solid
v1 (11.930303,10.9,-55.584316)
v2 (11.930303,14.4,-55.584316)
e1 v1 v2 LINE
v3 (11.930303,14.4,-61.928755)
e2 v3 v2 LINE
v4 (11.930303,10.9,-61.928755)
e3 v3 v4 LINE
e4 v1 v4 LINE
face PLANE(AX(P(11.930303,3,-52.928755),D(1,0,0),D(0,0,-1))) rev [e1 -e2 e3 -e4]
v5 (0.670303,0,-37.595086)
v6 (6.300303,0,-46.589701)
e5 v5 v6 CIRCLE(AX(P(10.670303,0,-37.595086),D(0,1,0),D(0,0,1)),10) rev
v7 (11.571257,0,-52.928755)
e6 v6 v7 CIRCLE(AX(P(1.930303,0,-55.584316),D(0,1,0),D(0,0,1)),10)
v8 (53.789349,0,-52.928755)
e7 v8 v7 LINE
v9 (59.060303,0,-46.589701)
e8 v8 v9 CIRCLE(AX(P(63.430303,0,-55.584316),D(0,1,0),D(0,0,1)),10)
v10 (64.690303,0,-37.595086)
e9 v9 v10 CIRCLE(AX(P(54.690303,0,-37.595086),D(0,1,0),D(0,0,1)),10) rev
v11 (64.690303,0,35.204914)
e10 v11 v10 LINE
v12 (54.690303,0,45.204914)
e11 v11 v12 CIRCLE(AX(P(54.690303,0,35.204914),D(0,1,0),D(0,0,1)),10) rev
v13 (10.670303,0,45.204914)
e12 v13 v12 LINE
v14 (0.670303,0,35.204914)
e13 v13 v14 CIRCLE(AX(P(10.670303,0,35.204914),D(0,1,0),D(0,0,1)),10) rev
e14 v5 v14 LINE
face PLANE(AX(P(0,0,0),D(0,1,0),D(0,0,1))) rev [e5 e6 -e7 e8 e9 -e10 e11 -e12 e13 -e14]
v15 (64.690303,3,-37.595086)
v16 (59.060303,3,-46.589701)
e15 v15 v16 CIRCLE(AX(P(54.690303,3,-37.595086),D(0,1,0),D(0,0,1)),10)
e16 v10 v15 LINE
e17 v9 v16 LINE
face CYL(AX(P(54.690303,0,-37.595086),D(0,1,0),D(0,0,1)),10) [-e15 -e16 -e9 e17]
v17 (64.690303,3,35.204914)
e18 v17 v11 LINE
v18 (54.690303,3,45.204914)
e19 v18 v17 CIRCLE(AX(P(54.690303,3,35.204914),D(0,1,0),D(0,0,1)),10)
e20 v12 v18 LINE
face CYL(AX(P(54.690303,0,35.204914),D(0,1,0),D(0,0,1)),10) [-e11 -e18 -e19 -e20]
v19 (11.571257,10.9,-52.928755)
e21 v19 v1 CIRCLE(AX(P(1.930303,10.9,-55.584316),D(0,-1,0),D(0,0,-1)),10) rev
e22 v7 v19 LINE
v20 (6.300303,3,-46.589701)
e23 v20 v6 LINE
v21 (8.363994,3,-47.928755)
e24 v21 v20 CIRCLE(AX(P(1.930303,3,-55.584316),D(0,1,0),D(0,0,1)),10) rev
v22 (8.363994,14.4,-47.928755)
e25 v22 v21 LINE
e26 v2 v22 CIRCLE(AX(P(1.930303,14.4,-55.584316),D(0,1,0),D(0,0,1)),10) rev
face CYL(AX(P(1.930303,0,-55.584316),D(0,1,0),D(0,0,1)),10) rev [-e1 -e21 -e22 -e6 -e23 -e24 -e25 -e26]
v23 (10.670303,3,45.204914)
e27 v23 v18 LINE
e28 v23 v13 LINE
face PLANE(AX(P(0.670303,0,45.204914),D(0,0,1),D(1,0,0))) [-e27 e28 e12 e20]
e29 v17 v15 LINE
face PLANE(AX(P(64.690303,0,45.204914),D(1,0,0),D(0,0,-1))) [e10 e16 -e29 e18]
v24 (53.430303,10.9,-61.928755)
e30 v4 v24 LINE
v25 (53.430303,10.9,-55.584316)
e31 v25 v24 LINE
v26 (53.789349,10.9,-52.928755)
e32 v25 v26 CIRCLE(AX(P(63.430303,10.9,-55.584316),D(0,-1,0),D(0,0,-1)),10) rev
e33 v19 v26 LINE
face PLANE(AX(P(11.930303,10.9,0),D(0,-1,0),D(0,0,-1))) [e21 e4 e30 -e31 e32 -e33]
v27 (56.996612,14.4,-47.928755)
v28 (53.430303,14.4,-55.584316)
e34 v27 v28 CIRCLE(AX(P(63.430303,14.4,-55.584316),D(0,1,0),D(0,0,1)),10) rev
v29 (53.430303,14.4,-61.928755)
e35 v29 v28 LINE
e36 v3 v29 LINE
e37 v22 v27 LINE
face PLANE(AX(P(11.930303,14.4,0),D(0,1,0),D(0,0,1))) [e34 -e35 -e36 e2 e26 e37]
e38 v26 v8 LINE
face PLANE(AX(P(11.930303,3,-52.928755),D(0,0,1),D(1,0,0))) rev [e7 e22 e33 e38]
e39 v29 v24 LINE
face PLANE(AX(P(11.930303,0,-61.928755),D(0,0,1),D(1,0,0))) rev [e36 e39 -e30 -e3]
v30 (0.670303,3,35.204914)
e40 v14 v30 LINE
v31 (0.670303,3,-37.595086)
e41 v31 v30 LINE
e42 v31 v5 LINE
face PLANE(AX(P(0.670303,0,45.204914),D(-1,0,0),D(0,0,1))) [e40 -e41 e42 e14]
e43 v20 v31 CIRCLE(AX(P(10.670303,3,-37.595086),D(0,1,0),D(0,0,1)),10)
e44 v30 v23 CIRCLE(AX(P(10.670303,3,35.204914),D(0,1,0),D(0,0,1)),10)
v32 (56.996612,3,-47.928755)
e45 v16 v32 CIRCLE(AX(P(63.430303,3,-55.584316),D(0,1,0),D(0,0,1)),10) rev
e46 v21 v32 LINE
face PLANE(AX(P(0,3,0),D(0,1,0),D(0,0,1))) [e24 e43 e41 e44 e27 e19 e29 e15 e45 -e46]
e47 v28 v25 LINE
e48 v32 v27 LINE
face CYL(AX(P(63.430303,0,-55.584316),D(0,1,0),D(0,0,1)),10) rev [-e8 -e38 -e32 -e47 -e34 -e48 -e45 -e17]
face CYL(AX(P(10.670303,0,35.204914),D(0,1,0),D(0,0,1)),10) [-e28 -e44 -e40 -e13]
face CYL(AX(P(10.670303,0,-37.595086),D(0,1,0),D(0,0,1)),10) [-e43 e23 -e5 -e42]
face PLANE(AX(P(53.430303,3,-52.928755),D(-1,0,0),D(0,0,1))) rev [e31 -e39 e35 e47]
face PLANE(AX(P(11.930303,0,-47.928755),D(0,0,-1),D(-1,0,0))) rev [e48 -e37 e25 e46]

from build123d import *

# Parameters (mm, degrees)
SKETCH1_W           = 41.5
SKETCH1_H           = 92.8
BOSS_EXTRUDE1_DEPTH = 3
SKETCH2_W           = 5
SKETCH2_H           = 3.5
SKETCH2_H_2         = 7.9
SKETCH2_W_2         = 9
BOSS_EXTRUDE2_DEPTH = 41.5
SKETCH3_W           = 64.02
SKETCH3_H           = 92.8
BOSS_EXTRUDE3_DEPTH = 3
FILLET1_R           = 10
FILLET2_R           = 10


with BuildPart() as part:
    # Sketch1 → Boss-Extrude1 (new body)
    with BuildSketch(Plane(origin=(0, 0, 0), x_dir=(1, 0, 0), z_dir=(0, 1, 0))):
        with Locations((32.680302971, 6.528754522)):
            Rectangle(SKETCH1_W, SKETCH1_H)
    extrude(amount=BOSS_EXTRUDE1_DEPTH)

    # Sketch2 → Boss-Extrude2 (add)
    with BuildSketch(Plane(origin=(53.430302971, 0, 0), x_dir=(0, 0, -1), z_dir=(1, 0, 0))):
        with Locations((50.428754522, 12.65)):
            Rectangle(SKETCH2_W, SKETCH2_H)
        with Locations((50.428754522, 6.95)):
            Rectangle(SKETCH2_W, SKETCH2_H_2)
        with Locations((57.428754522, 12.65)):
            Rectangle(SKETCH2_W_2, SKETCH2_H)
    extrude(amount=-BOSS_EXTRUDE2_DEPTH)

    # Sketch3 → Boss-Extrude3 (add)
    with BuildSketch(Plane(origin=(0, 3, 0), x_dir=(1, 0, 0), z_dir=(0, 1, 0))):
        with Locations((32.680302971, 1.195086087)):
            Rectangle(SKETCH3_W, SKETCH3_H)
    extrude(amount=-BOSS_EXTRUDE3_DEPTH)

    # Fillet1
    fillet1_edges = [part.edges().sort_by_distance(p)[0] for p in [
        (0.670302971, 1.5, -47.595086087),
        (64.690302971, 1.5, -47.595086087),
        (64.690302971, 1.5, 45.204913913),
        (0.670302971, 1.5, 45.204913913),
    ]]
    fillet(fillet1_edges, radius=FILLET1_R)

    # Fillet2
    # the kernel refuses this fillet: 10 mm, written as the material it adds along each edge
    with BuildSketch(Plane(origin=(11.930302971, 22.973075278, -47.595086087), x_dir=(0, 0, -1), z_dir=(0, -1, 0))) as fillet2_piece_1_section:
        with BuildLine():
            CenterArc((7.989230111, -10), FILLET2_R, 90, 64.087374577)
            Line((-1.005384944, -5.63), (-1.90484645, -5.193))
            ThreePointArc((-1.90484645, -5.193), (-1, -1.26), (-1, 0))
            Line((-1, 0), (0, 1))
            Line((0, 1), (7.989230111, 1))
            Line((7.989230111, 1), (7.989230111, 0))
        make_face()
    fillet2_piece_1 = extrude(amount=22.973075278, mode=Mode.PRIVATE)
    fillet2_piece_1 = split(fillet2_piece_1, bisect_by=Plane(origin=(12.365804392, 12.65, -52.928754522), z_dir=(0, 0, -1)), keep=Keep.TOP, mode=Mode.PRIVATE)
    fillet2_piece_1 = split(fillet2_piece_1, bisect_by=Plane(origin=(12.365804392, 10.9, -54.185779558), z_dir=(0, 1, 0)), keep=Keep.TOP, mode=Mode.PRIVATE)
    fillet2_piece_1 = split(fillet2_piece_1, bisect_by=Plane(origin=(12.365804392, 14.4, -54.185779558), z_dir=(0, -1, 0)), keep=Keep.TOP, mode=Mode.PRIVATE)
    add(fillet2_piece_1)
    with BuildSketch(Plane(origin=(11.930302971, 22.973075278, -47.595086087), x_dir=(0, 0, -1), z_dir=(0, -1, 0))) as fillet2_piece_2_section:
        with BuildLine():
            CenterArc((7.989230111, -10), FILLET2_R, 90, 64.087374577)
            Line((-1.005384944, -5.63), (-1.90484645, -5.193))
            ThreePointArc((-1.90484645, -5.193), (-1, -1.26), (-1, 0))
            Line((-1, 0), (0, 1))
            Line((0, 1), (7.989230111, 1))
            Line((7.989230111, 1), (7.989230111, 0))
        make_face()
    fillet2_piece_2 = extrude(amount=22.973075278, mode=Mode.PRIVATE)
    fillet2_piece_2 = split(fillet2_piece_2, bisect_by=Plane(origin=(11.467639637, 12.65, -52.928754522), z_dir=(0, 0, 1)), keep=Keep.TOP, mode=Mode.PRIVATE)
    fillet2_piece_2 = split(fillet2_piece_2, bisect_by=Plane(origin=(11.467639637, 10.9, -49.92895082), z_dir=(0, 1, 0)), keep=Keep.TOP, mode=Mode.PRIVATE)
    fillet2_piece_2 = split(fillet2_piece_2, bisect_by=Plane(origin=(11.467639637, 14.4, -49.92895082), z_dir=(0, -1, 0)), keep=Keep.TOP, mode=Mode.PRIVATE)
    fillet2_piece_2 = split(fillet2_piece_2, bisect_by=Plane(origin=(11.467639637, 12.65, -47.928754522), z_dir=(0, 0, -1)), keep=Keep.TOP, mode=Mode.PRIVATE)
    add(fillet2_piece_2)
    with BuildSketch(Plane(origin=(11.930302971, 22.973075278, -47.595086087), x_dir=(0, 0, -1), z_dir=(0, -1, 0))) as fillet2_piece_3_section:
        with BuildLine():
            CenterArc((7.989230111, -10), FILLET2_R, 90, 64.087374577)
            Line((-1.005384944, -5.63), (-1.90484645, -5.193))
            ThreePointArc((-1.90484645, -5.193), (-1, -1.26), (-1, 0))
            Line((-1, 0), (0, 1))
            Line((0, 1), (7.989230111, 1))
            Line((7.989230111, 1), (7.989230111, 0))
        make_face()
    fillet2_piece_3 = extrude(amount=22.973075278, mode=Mode.PRIVATE)
    fillet2_piece_3 = split(fillet2_piece_3, bisect_by=Plane(origin=(11.467639637, 6.95, -52.928754522), z_dir=(0, 0, 1)), keep=Keep.TOP, mode=Mode.PRIVATE)
    fillet2_piece_3 = split(fillet2_piece_3, bisect_by=Plane(origin=(11.467639637, 10.9, -49.92895082), z_dir=(0, -1, 0)), keep=Keep.TOP, mode=Mode.PRIVATE)
    fillet2_piece_3 = split(fillet2_piece_3, bisect_by=Plane(origin=(11.467639637, 6.95, -47.928754522), z_dir=(0, 0, -1)), keep=Keep.TOP, mode=Mode.PRIVATE)
    fillet2_piece_3 = split(fillet2_piece_3, bisect_by=Plane(origin=(11.467639637, 3, -49.92895082), z_dir=(0, 1, 0)), keep=Keep.TOP, mode=Mode.PRIVATE)
    add(fillet2_piece_3)
    with BuildSketch(Plane(origin=(11.930302971, 3, -47.595086087), x_dir=(0, 0, -1), z_dir=(0, -1, 0))) as fillet2_piece_4_section:
        with BuildLine():
            CenterArc((7.989230111, -10), FILLET2_R, 90, 64.087374577)
            Line((-1.005384944, -5.63), (-1.90484645, -5.193))
            ThreePointArc((-1.90484645, -5.193), (-1, -1.26), (-1, 0))
            Line((-1, 0), (0, 1))
            Line((0, 1), (7.989230111, 1))
            Line((7.989230111, 1), (7.989230111, 0))
        make_face()
    fillet2_piece_4 = extrude(amount=3, mode=Mode.PRIVATE)
    fillet2_piece_4 = split(fillet2_piece_4, bisect_by=Plane(origin=(11.467639637, 1.5, -52.928754522), z_dir=(0, 0, 1)), keep=Keep.TOP, mode=Mode.PRIVATE)
    fillet2_piece_4 = split(fillet2_piece_4, bisect_by=Plane(origin=(11.467639637, 1.5, -47.928754522), z_dir=(0, 0, -1)), keep=Keep.TOP, mode=Mode.PRIVATE)
    add(fillet2_piece_4)
    with BuildSketch(Plane(origin=(11.930302971, 3, -47.595086087), x_dir=(0, 0, -1), z_dir=(0, -1, 0))) as fillet2_piece_5_section:
        with BuildLine():
            CenterArc((7.989230111, -10), FILLET2_R, 90, 64.087374577)
            Line((-1.005384944, -5.63), (-1.90484645, -5.193))
            ThreePointArc((-1.90484645, -5.193), (-1, -1.26), (-1, 0))
            Line((-1, 0), (0, 1))
            Line((0, 1), (7.989230111, 1))
            Line((7.989230111, 1), (7.989230111, 0))
        make_face()
    fillet2_piece_5 = extrude(amount=3, mode=Mode.PRIVATE)
    fillet2_piece_5 = split(fillet2_piece_5, bisect_by=Plane(origin=(9.548517713, 1.5, -47.928754522), z_dir=(0, 0, 1)), keep=Keep.TOP, mode=Mode.PRIVATE)
    add(fillet2_piece_5)
    with BuildSketch(Plane(origin=(53.430302971, 0, -47.595086087), x_dir=(0.9844267342530738, 0, 0.17579534944880632), z_dir=(0, 1, 0))) as fillet2_piece_6_section:
        with BuildLine():
            CenterArc((8.439797843, 9.622765202), FILLET2_R, 190.124945844, 64.087374577)
            Line((-1.404469499, 7.864811708), (-2.388896234, 7.689016358))
            Line((-2.388896234, 7.689016358), (-0.984426734, -0.175795349))
            Line((-0.984426734, -0.175795349), (0.175795349, -0.984426734))
            ThreePointArc((0.175795349, -0.984426734), (1.416173035, -0.762924594), (5.446991178, -0.96227652))
            Line((5.446991178, -0.96227652), (5.719064511, 0))
        make_face()
    fillet2_piece_6 = extrude(amount=3, mode=Mode.PRIVATE)
    fillet2_piece_6 = split(fillet2_piece_6, bisect_by=Plane(origin=(55.812088229, 1.5, -47.928754522), z_dir=(0, 0, 1)), keep=Keep.TOP, mode=Mode.PRIVATE)
    add(fillet2_piece_6)
    with BuildSketch(Plane(origin=(53.430302971, 0, -47.595086087), x_dir=(0.9844267342530738, 0, 0.17579534944880632), z_dir=(0, 1, 0))) as fillet2_piece_7_section:
        with BuildLine():
            CenterArc((8.439797843, 9.622765202), FILLET2_R, 190.124945844, 64.087374577)
            Line((-1.404469499, 7.864811708), (-2.388896234, 7.689016358))
            Line((-2.388896234, 7.689016358), (-0.984426734, -0.175795349))
            Line((-0.984426734, -0.175795349), (0.175795349, -0.984426734))
            ThreePointArc((0.175795349, -0.984426734), (1.416173035, -0.762924594), (5.446991178, -0.96227652))
            Line((5.446991178, -0.96227652), (5.719064511, 0))
        make_face()
    fillet2_piece_7 = extrude(amount=3, mode=Mode.PRIVATE)
    fillet2_piece_7 = split(fillet2_piece_7, bisect_by=Plane(origin=(53.892966305, 1.5, -52.928754522), z_dir=(0, 0, 1)), keep=Keep.TOP, mode=Mode.PRIVATE)
    fillet2_piece_7 = split(fillet2_piece_7, bisect_by=Plane(origin=(53.892966305, 1.5, -47.928754522), z_dir=(0, 0, -1)), keep=Keep.TOP, mode=Mode.PRIVATE)
    add(fillet2_piece_7)
    with BuildSketch(Plane(origin=(53.430302971, 0, -47.595086087), x_dir=(0.9844267342530738, 0, 0.17579534944880632), z_dir=(0, 1, 0))) as fillet2_piece_8_section:
        with BuildLine():
            CenterArc((8.439797843, 9.622765202), FILLET2_R, 190.124945844, 64.087374577)
            Line((-1.404469499, 7.864811708), (-2.388896234, 7.689016358))
            Line((-2.388896234, 7.689016358), (-0.984426734, -0.175795349))
            Line((-0.984426734, -0.175795349), (0.175795349, -0.984426734))
            ThreePointArc((0.175795349, -0.984426734), (1.416173035, -0.762924594), (5.446991178, -0.96227652))
            Line((5.446991178, -0.96227652), (5.719064511, 0))
        make_face()
    fillet2_piece_8 = extrude(amount=22.973075278, mode=Mode.PRIVATE)
    fillet2_piece_8 = split(fillet2_piece_8, bisect_by=Plane(origin=(53.892966305, 3, -49.92895082), z_dir=(0, 1, 0)), keep=Keep.TOP, mode=Mode.PRIVATE)
    fillet2_piece_8 = split(fillet2_piece_8, bisect_by=Plane(origin=(53.892966305, 6.95, -52.928754522), z_dir=(0, 0, 1)), keep=Keep.TOP, mode=Mode.PRIVATE)
    fillet2_piece_8 = split(fillet2_piece_8, bisect_by=Plane(origin=(53.892966305, 6.95, -47.928754522), z_dir=(0, 0, -1)), keep=Keep.TOP, mode=Mode.PRIVATE)
    fillet2_piece_8 = split(fillet2_piece_8, bisect_by=Plane(origin=(53.892966305, 10.9, -49.92895082), z_dir=(0, -1, 0)), keep=Keep.TOP, mode=Mode.PRIVATE)
    add(fillet2_piece_8)
    with BuildSketch(Plane(origin=(53.430302971, 0, -47.595086087), x_dir=(0.9844267342530738, 0, 0.17579534944880632), z_dir=(0, 1, 0))) as fillet2_piece_9_section:
        with BuildLine():
            CenterArc((8.439797843, 9.622765202), FILLET2_R, 190.124945844, 64.087374577)
            Line((-1.404469499, 7.864811708), (-2.388896234, 7.689016358))
            Line((-2.388896234, 7.689016358), (-0.984426734, -0.175795349))
            Line((-0.984426734, -0.175795349), (0.175795349, -0.984426734))
            ThreePointArc((0.175795349, -0.984426734), (1.416173035, -0.762924594), (5.446991178, -0.96227652))
            Line((5.446991178, -0.96227652), (5.719064511, 0))
        make_face()
    fillet2_piece_9 = extrude(amount=22.973075278, mode=Mode.PRIVATE)
    fillet2_piece_9 = split(fillet2_piece_9, bisect_by=Plane(origin=(53.892966305, 12.65, -52.928754522), z_dir=(0, 0, 1)), keep=Keep.TOP, mode=Mode.PRIVATE)
    fillet2_piece_9 = split(fillet2_piece_9, bisect_by=Plane(origin=(53.892966305, 12.65, -47.928754522), z_dir=(0, 0, -1)), keep=Keep.TOP, mode=Mode.PRIVATE)
    fillet2_piece_9 = split(fillet2_piece_9, bisect_by=Plane(origin=(53.892966305, 14.4, -49.92895082), z_dir=(0, -1, 0)), keep=Keep.TOP, mode=Mode.PRIVATE)
    fillet2_piece_9 = split(fillet2_piece_9, bisect_by=Plane(origin=(53.892966305, 10.9, -49.92895082), z_dir=(0, 1, 0)), keep=Keep.TOP, mode=Mode.PRIVATE)
    add(fillet2_piece_9)
    with BuildSketch(Plane(origin=(53.430302971, 0, -47.595086087), x_dir=(0.9844267342530738, 0, 0.17579534944880632), z_dir=(0, 1, 0))) as fillet2_piece_10_section:
        with BuildLine():
            CenterArc((8.439797843, 9.622765202), FILLET2_R, 190.124945844, 64.087374577)
            Line((-1.404469499, 7.864811708), (-2.388896234, 7.689016358))
            Line((-2.388896234, 7.689016358), (-0.984426734, -0.175795349))
            Line((-0.984426734, -0.175795349), (0.175795349, -0.984426734))
            ThreePointArc((0.175795349, -0.984426734), (1.416173035, -0.762924594), (5.446991178, -0.96227652))
            Line((5.446991178, -0.96227652), (5.719064511, 0))
        make_face()
    fillet2_piece_10 = extrude(amount=22.973075278, mode=Mode.PRIVATE)
    fillet2_piece_10 = split(fillet2_piece_10, bisect_by=Plane(origin=(52.99480155, 12.65, -52.928754522), z_dir=(0, 0, -1)), keep=Keep.TOP, mode=Mode.PRIVATE)
    fillet2_piece_10 = split(fillet2_piece_10, bisect_by=Plane(origin=(52.99480155, 14.4, -54.185779558), z_dir=(0, -1, 0)), keep=Keep.TOP, mode=Mode.PRIVATE)
    fillet2_piece_10 = split(fillet2_piece_10, bisect_by=Plane(origin=(52.99480155, 10.9, -54.185779558), z_dir=(0, 1, 0)), keep=Keep.TOP, mode=Mode.PRIVATE)
    add(fillet2_piece_10)


solid = part.part
